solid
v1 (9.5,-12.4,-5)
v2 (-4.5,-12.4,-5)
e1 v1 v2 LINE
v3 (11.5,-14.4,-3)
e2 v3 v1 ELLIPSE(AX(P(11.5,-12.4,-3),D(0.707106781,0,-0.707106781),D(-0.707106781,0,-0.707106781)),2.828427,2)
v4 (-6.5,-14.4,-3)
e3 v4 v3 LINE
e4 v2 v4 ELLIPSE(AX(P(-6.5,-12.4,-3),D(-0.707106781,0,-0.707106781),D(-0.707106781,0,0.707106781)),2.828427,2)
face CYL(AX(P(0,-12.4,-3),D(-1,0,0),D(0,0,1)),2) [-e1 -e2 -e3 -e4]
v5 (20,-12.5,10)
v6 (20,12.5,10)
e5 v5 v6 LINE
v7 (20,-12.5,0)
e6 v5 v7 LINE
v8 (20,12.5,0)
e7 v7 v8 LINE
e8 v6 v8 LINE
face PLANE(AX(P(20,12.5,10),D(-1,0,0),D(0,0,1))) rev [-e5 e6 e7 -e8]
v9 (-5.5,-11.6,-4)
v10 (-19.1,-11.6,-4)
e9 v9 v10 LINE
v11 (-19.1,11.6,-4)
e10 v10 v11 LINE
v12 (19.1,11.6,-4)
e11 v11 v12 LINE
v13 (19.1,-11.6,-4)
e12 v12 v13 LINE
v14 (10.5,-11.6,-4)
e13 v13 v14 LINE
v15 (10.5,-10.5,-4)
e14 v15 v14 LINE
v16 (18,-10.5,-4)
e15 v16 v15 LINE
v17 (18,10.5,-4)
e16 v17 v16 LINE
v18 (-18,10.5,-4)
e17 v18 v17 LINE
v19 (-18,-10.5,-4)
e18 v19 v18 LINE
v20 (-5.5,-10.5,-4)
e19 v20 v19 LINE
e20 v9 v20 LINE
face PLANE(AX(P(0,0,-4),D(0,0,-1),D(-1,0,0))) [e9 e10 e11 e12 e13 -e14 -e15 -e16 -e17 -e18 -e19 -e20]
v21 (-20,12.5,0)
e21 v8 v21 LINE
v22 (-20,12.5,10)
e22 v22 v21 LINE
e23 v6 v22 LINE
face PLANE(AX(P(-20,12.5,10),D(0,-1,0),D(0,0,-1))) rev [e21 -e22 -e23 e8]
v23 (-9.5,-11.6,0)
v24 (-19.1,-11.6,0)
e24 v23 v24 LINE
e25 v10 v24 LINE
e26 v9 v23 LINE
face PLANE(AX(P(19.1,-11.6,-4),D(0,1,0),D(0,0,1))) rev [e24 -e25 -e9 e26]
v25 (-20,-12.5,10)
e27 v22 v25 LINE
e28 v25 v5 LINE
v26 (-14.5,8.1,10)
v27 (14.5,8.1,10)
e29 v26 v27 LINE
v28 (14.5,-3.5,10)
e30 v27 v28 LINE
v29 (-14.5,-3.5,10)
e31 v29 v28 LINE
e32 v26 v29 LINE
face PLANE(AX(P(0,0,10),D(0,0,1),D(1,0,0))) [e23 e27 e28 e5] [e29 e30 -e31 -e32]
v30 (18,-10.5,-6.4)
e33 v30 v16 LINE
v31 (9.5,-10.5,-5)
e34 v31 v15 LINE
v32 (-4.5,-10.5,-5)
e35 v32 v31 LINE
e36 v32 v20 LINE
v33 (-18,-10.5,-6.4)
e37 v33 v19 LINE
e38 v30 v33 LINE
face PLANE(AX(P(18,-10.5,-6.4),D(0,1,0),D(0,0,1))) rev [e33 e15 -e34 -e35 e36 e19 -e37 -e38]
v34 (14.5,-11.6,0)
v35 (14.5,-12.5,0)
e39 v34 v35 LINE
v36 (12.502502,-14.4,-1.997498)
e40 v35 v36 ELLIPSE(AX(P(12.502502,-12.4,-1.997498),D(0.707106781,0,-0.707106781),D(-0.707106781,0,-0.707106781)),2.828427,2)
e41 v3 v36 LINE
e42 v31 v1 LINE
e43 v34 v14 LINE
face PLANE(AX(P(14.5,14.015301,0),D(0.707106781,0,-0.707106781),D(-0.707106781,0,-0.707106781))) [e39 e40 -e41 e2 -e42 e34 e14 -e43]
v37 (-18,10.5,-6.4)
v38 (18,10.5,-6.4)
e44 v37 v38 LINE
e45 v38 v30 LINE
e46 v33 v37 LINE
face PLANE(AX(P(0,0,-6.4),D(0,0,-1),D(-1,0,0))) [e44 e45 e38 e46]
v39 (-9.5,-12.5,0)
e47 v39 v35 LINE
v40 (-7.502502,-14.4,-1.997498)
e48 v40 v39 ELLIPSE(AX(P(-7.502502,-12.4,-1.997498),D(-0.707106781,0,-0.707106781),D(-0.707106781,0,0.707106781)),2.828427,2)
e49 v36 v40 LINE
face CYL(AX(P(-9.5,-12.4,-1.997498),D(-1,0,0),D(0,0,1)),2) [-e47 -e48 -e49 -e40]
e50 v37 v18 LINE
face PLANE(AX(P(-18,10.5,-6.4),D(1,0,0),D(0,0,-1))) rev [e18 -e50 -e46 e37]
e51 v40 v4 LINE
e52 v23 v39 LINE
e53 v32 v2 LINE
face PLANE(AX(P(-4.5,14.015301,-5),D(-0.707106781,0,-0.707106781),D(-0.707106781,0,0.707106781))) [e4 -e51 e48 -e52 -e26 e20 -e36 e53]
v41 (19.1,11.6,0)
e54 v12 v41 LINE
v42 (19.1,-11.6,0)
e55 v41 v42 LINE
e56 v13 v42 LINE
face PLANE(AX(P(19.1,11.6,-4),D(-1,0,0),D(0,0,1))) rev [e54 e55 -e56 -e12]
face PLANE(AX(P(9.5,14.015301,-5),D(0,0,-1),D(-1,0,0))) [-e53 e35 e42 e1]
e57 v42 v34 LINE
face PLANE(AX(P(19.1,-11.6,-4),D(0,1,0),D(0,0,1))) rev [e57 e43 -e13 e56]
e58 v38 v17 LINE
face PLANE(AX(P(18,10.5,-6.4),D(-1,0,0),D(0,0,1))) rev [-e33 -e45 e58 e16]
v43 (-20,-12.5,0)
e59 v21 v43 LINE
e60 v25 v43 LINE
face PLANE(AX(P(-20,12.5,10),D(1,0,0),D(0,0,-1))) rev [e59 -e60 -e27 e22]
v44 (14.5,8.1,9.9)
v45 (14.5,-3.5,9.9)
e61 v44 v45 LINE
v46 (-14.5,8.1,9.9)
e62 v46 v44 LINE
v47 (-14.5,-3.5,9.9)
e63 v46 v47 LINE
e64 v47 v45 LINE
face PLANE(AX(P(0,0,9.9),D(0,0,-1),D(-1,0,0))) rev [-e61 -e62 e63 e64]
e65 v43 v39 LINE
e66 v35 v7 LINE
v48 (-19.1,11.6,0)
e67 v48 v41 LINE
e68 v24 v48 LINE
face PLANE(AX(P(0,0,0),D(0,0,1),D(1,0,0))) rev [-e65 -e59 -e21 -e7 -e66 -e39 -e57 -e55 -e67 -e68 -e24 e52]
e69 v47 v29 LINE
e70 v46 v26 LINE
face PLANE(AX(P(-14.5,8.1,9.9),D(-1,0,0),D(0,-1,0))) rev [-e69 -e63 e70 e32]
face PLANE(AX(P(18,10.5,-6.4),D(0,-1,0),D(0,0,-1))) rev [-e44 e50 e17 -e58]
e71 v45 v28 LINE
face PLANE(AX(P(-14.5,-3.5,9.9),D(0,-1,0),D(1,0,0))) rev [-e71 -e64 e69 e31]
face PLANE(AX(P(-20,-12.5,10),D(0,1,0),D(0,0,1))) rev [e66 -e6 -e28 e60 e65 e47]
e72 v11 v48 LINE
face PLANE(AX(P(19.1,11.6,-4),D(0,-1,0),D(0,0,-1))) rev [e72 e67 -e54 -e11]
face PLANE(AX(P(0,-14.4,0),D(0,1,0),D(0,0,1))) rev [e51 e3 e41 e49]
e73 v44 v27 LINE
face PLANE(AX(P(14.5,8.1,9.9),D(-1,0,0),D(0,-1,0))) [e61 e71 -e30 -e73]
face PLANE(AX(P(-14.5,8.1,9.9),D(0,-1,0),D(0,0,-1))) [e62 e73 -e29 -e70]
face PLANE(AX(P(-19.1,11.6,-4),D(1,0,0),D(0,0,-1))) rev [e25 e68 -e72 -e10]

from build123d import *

# Parameters (mm, degrees)
SKETCH1_W                       = 40
SKETCH1_H                       = 25
BOSS_EXTRUDE1_DEPTH             = 10
SKETCH2_W                       = 29
SKETCH2_H                       = 11.6
CUT_EXTRUDE1_DEPTH              = 0.1
SKETCH4_W                       = 38.2
SKETCH4_H                       = 23.2
BOSS_EXTRUDE2_DEPTH             = 4
SKETCH5_W                       = 36
SKETCH5_H                       = 21
BOSS_EXTRUDE3_DEPTH             = 2.4
BOSS_EXTRUDE5_DEPTH             = 2.8
BOSS_EXTRUDE5_DIRECTION_2_REACH = 34.876
FILLET1_R                       = 2


with BuildPart() as part:
    # Sketch1 → Boss-Extrude1 (new body)
    with BuildSketch(Plane.XY):
        Rectangle(SKETCH1_W, SKETCH1_H)
    extrude(amount=BOSS_EXTRUDE1_DEPTH)

    # Sketch2 → Cut-Extrude1 (cut)
    with BuildSketch(Plane.XY.offset(10)):
        with Locations((0, 2.3)):
            Rectangle(SKETCH2_W, SKETCH2_H)
    extrude(amount=-CUT_EXTRUDE1_DEPTH, mode=Mode.SUBTRACT)

    # Sketch4 → Boss-Extrude2 (add)
    with BuildSketch(Plane(origin=(0, 0, 0), x_dir=(-1, 0, 0), z_dir=(0, 0, -1))):
        Rectangle(SKETCH4_W, SKETCH4_H)
    extrude(amount=BOSS_EXTRUDE2_DEPTH)

    # Sketch5 → Boss-Extrude3 (add)
    with BuildSketch(Plane(origin=(0, 0, -4), x_dir=(-1, 0, 0), z_dir=(0, 0, -1))):
        Rectangle(SKETCH5_W, SKETCH5_H)
    extrude(amount=BOSS_EXTRUDE3_DEPTH)

    # Sketch7 → Boss-Extrude5 (add)
    with BuildSketch(Plane.XZ.offset(11.6)):
        Polygon((14.5, 0), (9.5, -5), (-4.5, -5), (-9.5, 0), align=None)
    extrude(amount=BOSS_EXTRUDE5_DEPTH)

    # Boss-Extrude5 direction 2: up to this face of the body (flat: up to its plane)
    boss_extrude5_direction_2_end = Plane(part.part.faces().sort_by_distance((0, -10.5, -5.2))[0])
    # Sketch7 → Boss-Extrude5 direction 2 (add, up to the picked face)
    with BuildSketch(Plane.XZ.offset(11.6), mode=Mode.PRIVATE) as boss_extrude5_direction_2_sk1:
        Polygon((14.5, 0), (9.5, -5), (-4.5, -5), (-9.5, 0), align=None)
    boss_extrude5_direction_2_tool1 = split(extrude(boss_extrude5_direction_2_sk1.sketch, amount=-BOSS_EXTRUDE5_DIRECTION_2_REACH, mode=Mode.PRIVATE), bisect_by=boss_extrude5_direction_2_end, keep=Keep.BOTH, mode=Mode.PRIVATE)
    add(boss_extrude5_direction_2_tool1.solids().sort_by(Axis((2.5, -11.6, -2.280702), (0, 1, 0)))[0])

    # Fillet1
    # the kernel refuses this fillet: 2 mm, written as the material it takes off along each edge
    with BuildSketch(Plane(origin=(-14.493746089, -14.4, 0), x_dir=(0, 1, 0), z_dir=(1, 0, 0))) as fillet1_piece_1:
        with BuildLine():
            CenterArc((2, -1.997498436), FILLET1_R, 92.865983983, 87.134016017)
            Line((0, -1.997498436), (-0.04, -1.997498436))
            Line((-0.04, -1.997498436), (-0.04, 0))
            Line((-0.04, 0), (0, 0.04))
            ThreePointArc((0, 0.04), (0.95, 0.04), (1.898, 0.039949969))
            Line((1.898, 0.039949969), (1.9, 0))
        make_face()
    extrude(amount=33.987492178, mode=Mode.SUBTRACT)
    with BuildSketch(Plane(origin=(14.5, -14.4, -5), x_dir=(0, 1, 0), z_dir=(-1, 0, 0))) as fillet1_piece_2:
        with BuildLine():
            CenterArc((FILLET1_R, -FILLET1_R), FILLET1_R, 90, 90)
            Line((0, -FILLET1_R), (-FILLET1_R * 0.02, -FILLET1_R))
            Line((-FILLET1_R * 0.02, -FILLET1_R), (-FILLET1_R * 0.02, FILLET1_R * 0.02))
            Line((-FILLET1_R * 0.02, FILLET1_R * 0.02), (FILLET1_R, FILLET1_R * 0.02))
            Line((FILLET1_R, FILLET1_R * 0.02), (FILLET1_R, 0))
        make_face()
    extrude(amount=24, mode=Mode.SUBTRACT)


solid = part.part
